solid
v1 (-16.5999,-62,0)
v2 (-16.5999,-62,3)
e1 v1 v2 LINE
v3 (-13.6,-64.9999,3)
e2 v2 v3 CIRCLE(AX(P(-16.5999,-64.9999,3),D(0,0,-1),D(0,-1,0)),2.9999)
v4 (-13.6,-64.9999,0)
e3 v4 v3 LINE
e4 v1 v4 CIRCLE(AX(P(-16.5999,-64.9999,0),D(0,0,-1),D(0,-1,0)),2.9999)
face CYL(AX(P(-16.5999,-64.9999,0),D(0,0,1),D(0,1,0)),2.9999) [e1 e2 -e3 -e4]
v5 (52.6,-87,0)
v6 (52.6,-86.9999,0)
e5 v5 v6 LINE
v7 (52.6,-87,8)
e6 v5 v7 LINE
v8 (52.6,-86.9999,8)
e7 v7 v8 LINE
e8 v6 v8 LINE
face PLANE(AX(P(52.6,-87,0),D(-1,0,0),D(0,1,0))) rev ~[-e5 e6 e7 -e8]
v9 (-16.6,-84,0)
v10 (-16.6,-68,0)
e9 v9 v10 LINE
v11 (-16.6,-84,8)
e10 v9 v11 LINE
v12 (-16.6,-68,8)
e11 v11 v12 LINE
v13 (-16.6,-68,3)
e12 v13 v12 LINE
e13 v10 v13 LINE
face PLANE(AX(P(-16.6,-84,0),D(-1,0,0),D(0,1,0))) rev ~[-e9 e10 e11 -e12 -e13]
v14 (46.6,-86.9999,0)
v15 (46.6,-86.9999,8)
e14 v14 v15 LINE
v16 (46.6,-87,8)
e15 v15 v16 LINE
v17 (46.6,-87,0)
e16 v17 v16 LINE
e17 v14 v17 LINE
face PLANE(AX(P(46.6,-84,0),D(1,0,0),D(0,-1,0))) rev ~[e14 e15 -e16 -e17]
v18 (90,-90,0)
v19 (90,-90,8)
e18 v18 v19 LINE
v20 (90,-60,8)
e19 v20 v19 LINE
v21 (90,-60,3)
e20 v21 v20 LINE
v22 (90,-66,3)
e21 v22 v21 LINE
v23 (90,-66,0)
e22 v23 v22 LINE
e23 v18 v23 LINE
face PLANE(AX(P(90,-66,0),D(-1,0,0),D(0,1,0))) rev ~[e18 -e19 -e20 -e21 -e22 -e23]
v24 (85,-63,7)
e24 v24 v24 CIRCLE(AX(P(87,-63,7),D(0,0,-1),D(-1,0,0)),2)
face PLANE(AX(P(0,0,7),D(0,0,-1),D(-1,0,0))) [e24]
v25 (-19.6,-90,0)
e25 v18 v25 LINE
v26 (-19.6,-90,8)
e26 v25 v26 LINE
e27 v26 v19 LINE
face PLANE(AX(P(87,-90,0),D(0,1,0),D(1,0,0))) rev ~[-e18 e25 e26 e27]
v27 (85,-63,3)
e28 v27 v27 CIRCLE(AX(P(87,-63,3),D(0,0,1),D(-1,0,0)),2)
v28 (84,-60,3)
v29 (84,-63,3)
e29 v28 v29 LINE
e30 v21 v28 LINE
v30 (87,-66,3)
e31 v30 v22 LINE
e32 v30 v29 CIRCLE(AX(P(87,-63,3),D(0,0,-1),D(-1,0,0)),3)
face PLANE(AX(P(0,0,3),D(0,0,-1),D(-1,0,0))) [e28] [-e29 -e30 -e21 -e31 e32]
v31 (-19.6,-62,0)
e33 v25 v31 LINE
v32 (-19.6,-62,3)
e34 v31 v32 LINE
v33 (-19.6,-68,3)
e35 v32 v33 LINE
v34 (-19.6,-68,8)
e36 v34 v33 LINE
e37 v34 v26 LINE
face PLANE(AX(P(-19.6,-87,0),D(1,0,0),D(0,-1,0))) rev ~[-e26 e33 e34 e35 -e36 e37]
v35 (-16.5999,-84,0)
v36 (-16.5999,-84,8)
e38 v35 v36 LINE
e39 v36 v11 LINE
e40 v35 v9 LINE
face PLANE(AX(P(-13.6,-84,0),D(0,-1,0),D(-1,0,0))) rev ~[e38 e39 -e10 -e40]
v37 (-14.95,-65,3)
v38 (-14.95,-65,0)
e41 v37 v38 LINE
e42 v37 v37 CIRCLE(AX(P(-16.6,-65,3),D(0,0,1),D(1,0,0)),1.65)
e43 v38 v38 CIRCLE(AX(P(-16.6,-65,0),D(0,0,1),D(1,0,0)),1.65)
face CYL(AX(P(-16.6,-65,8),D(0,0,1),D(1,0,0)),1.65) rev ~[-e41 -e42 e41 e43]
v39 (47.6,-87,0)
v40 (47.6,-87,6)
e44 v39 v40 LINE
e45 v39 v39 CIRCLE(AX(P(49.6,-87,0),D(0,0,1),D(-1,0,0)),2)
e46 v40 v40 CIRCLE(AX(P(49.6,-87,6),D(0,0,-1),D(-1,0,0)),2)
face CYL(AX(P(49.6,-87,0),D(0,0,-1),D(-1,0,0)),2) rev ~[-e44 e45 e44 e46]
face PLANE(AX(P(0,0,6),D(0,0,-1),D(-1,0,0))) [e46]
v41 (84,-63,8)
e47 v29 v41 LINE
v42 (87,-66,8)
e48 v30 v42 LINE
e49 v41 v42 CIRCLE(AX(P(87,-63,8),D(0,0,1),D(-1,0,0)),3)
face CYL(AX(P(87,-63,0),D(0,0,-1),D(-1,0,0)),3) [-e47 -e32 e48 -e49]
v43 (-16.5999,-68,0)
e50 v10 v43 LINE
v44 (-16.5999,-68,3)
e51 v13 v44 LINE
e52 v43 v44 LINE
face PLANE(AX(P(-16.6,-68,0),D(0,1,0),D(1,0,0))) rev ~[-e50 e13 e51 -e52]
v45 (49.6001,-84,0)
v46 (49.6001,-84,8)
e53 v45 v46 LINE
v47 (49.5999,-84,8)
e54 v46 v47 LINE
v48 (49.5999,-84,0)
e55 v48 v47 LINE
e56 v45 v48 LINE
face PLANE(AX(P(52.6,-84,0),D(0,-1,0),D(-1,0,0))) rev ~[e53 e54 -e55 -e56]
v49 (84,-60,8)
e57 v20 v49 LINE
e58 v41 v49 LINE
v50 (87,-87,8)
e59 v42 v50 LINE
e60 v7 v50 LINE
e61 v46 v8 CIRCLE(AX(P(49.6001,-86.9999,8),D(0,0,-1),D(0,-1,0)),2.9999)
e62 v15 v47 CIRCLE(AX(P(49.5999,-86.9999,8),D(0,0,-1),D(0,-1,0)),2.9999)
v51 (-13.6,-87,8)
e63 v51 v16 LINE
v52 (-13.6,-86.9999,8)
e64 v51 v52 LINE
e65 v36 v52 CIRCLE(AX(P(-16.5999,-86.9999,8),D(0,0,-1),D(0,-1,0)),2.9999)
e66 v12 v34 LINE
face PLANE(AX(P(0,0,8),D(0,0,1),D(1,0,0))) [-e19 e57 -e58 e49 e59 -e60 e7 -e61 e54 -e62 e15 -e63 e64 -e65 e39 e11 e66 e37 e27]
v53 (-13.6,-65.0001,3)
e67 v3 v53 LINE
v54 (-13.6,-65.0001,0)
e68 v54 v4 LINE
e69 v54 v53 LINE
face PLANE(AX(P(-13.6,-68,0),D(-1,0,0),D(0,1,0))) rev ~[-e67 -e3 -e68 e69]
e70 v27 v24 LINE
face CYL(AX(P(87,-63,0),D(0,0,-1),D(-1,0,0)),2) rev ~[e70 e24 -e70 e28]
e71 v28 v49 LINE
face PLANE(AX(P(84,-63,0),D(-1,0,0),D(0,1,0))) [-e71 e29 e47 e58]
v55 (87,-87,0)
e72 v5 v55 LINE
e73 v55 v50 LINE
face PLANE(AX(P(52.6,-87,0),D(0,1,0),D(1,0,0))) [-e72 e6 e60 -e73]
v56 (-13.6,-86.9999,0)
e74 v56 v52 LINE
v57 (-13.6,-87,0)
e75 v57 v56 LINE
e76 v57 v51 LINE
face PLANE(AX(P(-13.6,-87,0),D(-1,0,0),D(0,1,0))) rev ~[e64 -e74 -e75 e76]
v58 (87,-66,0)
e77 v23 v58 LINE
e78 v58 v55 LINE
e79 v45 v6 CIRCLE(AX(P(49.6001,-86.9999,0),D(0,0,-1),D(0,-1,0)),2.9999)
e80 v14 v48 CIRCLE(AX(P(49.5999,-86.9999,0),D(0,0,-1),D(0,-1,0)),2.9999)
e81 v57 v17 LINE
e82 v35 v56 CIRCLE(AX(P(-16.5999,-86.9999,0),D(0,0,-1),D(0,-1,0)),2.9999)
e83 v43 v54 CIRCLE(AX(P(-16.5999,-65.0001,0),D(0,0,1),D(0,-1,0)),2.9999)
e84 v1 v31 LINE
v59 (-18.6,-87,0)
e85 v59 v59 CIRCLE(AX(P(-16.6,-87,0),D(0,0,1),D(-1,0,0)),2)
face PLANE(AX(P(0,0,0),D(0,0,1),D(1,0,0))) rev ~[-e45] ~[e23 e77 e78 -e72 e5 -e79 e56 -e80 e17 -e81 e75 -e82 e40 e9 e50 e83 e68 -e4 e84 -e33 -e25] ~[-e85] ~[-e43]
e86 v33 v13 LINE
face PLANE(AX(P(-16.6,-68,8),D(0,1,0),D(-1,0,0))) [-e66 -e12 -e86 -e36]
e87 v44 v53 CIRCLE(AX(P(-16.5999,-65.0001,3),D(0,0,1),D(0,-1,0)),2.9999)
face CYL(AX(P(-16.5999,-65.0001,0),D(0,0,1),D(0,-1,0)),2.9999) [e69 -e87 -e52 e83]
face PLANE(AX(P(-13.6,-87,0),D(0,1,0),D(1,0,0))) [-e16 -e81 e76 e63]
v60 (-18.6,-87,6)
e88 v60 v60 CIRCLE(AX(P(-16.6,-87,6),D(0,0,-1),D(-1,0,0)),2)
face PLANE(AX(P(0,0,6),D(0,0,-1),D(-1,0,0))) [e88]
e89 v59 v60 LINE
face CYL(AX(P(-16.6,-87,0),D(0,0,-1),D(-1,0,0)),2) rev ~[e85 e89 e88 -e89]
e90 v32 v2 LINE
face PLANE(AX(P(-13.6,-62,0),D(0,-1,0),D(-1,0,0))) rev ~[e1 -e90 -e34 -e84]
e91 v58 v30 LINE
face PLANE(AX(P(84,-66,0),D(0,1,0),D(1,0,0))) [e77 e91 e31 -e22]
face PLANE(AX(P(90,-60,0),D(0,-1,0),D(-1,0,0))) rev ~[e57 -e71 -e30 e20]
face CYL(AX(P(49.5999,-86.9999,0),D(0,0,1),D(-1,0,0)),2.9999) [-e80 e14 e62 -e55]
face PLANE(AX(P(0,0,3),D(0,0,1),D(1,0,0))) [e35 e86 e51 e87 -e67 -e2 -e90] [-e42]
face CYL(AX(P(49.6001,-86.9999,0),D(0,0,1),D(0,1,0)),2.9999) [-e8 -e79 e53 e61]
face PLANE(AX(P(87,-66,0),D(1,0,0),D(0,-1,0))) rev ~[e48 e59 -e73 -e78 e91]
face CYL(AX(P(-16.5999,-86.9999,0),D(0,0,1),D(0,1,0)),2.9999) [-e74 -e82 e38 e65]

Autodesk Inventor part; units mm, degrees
ref_plane "YZ Plane" through (0, 0, 0) normal (1, 0, 0) x (0, 1, 0)
ref_plane "XZ Plane" through (0, 0, 0) normal (0, 1, 0) x (-1, 0, 0)
ref_plane "XY Plane" through (0, 0, 0) normal (0, 0, 1) x (1, 0, 0)
sketch "Sketch1" plane through (0, 0, 0) normal (0, 0, 1) x (1, 0, 0)
  line L0 (-58, -60) -> (-60, -60) projected
  line L1 (-60, -60) -> (-60, -39.5) projected
  line L2 (-60, -39.5) -> (-58, -39.5) projected
  line L3 (-58, -39.5) -> (-58, -60) projected
  line L4 (49.6, 30) -> (51.6, 30) projected
  line L5 (51.6, 30) -> (51.6, 9.5) projected
  line L6 (51.6, 9.5) -> (49.6, 9.5) projected
  line L7 (49.6, 9.5) -> (49.6, 30) projected
  line L8 (-58, 39.5) -> (-60, 39.5) projected
  line L9 (-60, 39.5) -> (-60, 60) projected
  line L10 (-60, 60) -> (-58, 60) projected
  line L11 (-58, 60) -> (-58, 39.5) projected
  line L12 (-21.6, -39.5) -> (-19.6, -39.5) projected
  line L13 (-19.6, -39.5) -> (-19.6, -60) projected
  line L14 (-19.6, -60) -> (-21.6, -60) projected
  line L15 (-21.6, -60) -> (-21.6, -39.5) projected
  line L16 (51.6, -30) -> (49.6, -30) projected
  line L17 (49.6, -30) -> (49.6, -9.5) projected
  line L18 (49.6, -9.5) -> (51.6, -9.5) projected
  line L19 (51.6, -9.5) -> (51.6, -30) projected
  line L20 (-21.6, 60) -> (-19.6, 60) projected
  line L21 (-19.6, 60) -> (-19.6, 39.5) projected
  line L22 (-19.6, 39.5) -> (-21.6, 39.5) projected
  line L23 (-21.6, 39.5) -> (-21.6, 60) projected
  line L24 (90, -35) -> (90, 35) projected
  line L25 (90, 35) -> (49.6, 35) projected
  line L26 (49.6, 35) -> (49.6, 60) projected
  line L27 (49.6, 60) -> (90, 60) projected
  line L28 (90, 60) -> (90, 90) projected
  line L29 (90, 90) -> (-19.6, 90) projected
  line L30 (-19.6, 90) -> (-19.6, 65) projected
  line L31 (-19.6, 65) -> (-60, 65) projected
  line L32 (-60, 65) -> (-60, 90) projected
  line L33 (-60, 90) -> (-90, 90) projected
  line L34 (-90, 90) -> (-90, -90) projected
  line L35 (-90, -90) -> (-60, -90) projected
  line L36 (-60, -90) -> (-60, -65) projected
  line L37 (-60, -65) -> (-19.6, -65) projected
  line L38 (-19.6, -65) -> (-19.6, -90) projected
  line L39 (-19.6, -90) -> (90, -90) projected
  line L40 (90, -90) -> (90, -60) projected
  line L41 (90, -60) -> (49.6, -60) projected
  line L42 (49.6, -60) -> (49.6, -35) projected
  line L43 (49.6, -35) -> (90, -35) projected
  line L44 (86, -32) -> (73.8, -32) projected
  line L45 (73.8, -32) -> (73.8, -7.5) projected
  line L46 (73.8, -7.5) -> (86, -7.5) projected
  line L47 (86, -7.5) -> (86, -32) projected
  line L48 (65.8, -32) -> (53.6, -32) projected
  line L49 (53.6, -32) -> (53.6, -7.5) projected
  line L50 (53.6, -7.5) -> (65.8, -7.5) projected
  line L51 (65.8, -7.5) -> (65.8, -32) projected
  line L52 (86, -86) -> (70.6, -86) projected
  line L53 (70.6, -86) -> (70.6, -69.8) projected
  line L54 (70.6, -69.8) -> (86, -69.8) projected
  line L55 (86, -69.8) -> (86, -86) projected
  line L56 (86, 86) -> (86, 69.8) projected
  line L57 (86, 69.8) -> (70.6, 69.8) projected
  line L58 (70.6, 69.8) -> (70.6, 86) projected
  line L59 (70.6, 86) -> (86, 86) projected
  line L60 (73.8, 32) -> (86, 32) projected
  line L61 (86, 32) -> (86, 7.5) projected
  line L62 (86, 7.5) -> (73.8, 7.5) projected
  line L63 (73.8, 7.5) -> (73.8, 32) projected
  line L64 (65.8, 32) -> (65.8, 7.5) projected
  line L65 (65.8, 7.5) -> (53.6, 7.5) projected
  line L66 (53.6, 7.5) -> (53.6, 32) projected
  line L67 (53.6, 32) -> (65.8, 32) projected
  line L68 (-69.6, -87) -> (-85, -87) projected
  line L69 (-85, -87) -> (-85, -70.8) projected
  line L70 (-85, -70.8) -> (-69.6, -70.8) projected
  line L71 (-69.6, -70.8) -> (-69.6, -87) projected
  line L72 (-56, -62) -> (-56, -37.5) projected
  line L73 (-56, -37.5) -> (-43.8, -37.5) projected
  line L74 (-43.8, -37.5) -> (-43.8, -62) projected
  line L75 (-43.8, -62) -> (-56, -62) projected
  line L76 (-56, 62) -> (-43.8, 62) projected
  line L77 (-43.8, 62) -> (-43.8, 37.5) projected
  line L78 (-43.8, 37.5) -> (-56, 37.5) projected
  line L79 (-56, 37.5) -> (-56, 62) projected
  line L80 (-23.6, 62) -> (-23.6, 37.5) projected
  line L81 (-23.6, 37.5) -> (-35.8, 37.5) projected
  line L82 (-35.8, 37.5) -> (-35.8, 62) projected
  line L83 (-35.8, 62) -> (-23.6, 62) projected
  line L84 (-23.6, -62) -> (-35.8, -62) projected
  line L85 (-35.8, -62) -> (-35.8, -37.5) projected
  line L86 (-35.8, -37.5) -> (-23.6, -37.5) projected
  line L87 (-23.6, -37.5) -> (-23.6, -62) projected
  line L88 (-85, 87) -> (-69.6, 87) projected
  line L89 (-69.6, 87) -> (-69.6, 70.8) projected
  line L90 (-69.6, 70.8) -> (-85, 70.8) projected
  line L91 (-85, 70.8) -> (-85, 87) projected
  circle A0 centre (87, -63) radius 2 projected
  line L92 (90, -60) -> (90, -66) projected
  line L93 (84, -60) -> (90, -60) projected
  line L94 (84, -63) -> (84, -60) projected
  line L95 (90, -66) -> (87, -66) projected
  line L96 (-19.6, 68) -> (-16.6, 68) projected
  line L97 (-16.6, 68) -> (-16.6, 84) projected
  line L98 (-13.6, 87) -> (46.6, 87) projected
  line L99 (52.6, 87) -> (87, 87) projected
  line L100 (87, 87) -> (87, 66) projected
  line L101 (84, 63) -> (84, 60) projected
  line L102 (84, 60) -> (90, 60) projected
  line L103 (90, 60) -> (90, 90) projected
  line L104 (90, 90) -> (-19.6, 90) projected
  line L105 (-19.6, 90) -> (-19.6, 68) projected
  line L106 (90, -66) -> (87, -66)
  line L107 (87, -66) -> (87, -90)
  line L108 (87, -90) -> (90, -90)
  line L109 (90, -90) -> (90, -66)
  line L110 (87, -90) -> (-19.6, -90)
  line L111 (-19.6, -90) -> (-19.6, -87)
  line L112 (-19.6, -87) -> (87, -87)
  line L113 (87, -87) -> (87, -90)
  line L114 (-19.6, -87) -> (-16.6, -87)
  line L115 (-16.6, -87) -> (-16.6, -65)
  line L116 (-16.6, -65) -> (-19.6, -65)
  line L117 (-19.6, -65) -> (-19.6, -87)
  line L118 (-19.6, -65) -> (-16.6, -65)
  line L119 (-16.6, -65) -> (-16.6, -68)
  line L120 (-16.6, -68) -> (-19.6, -68)
  line L121 (-19.6, -68) -> (-19.6, -65)
  line L122 (-19.6, -68) -> (-13.6, -68)
  line L123 (-13.6, -68) -> (-13.6, -62)
  line L124 (-13.6, -62) -> (-19.6, -62)
  line L125 (-19.6, -62) -> (-19.6, -68)
  line L126 (-19.6, -90) -> (-13.6, -90)
  line L127 (-13.6, -90) -> (-13.6, -84)
  line L128 (-13.6, -84) -> (-19.6, -84)
  line L129 (-19.6, -84) -> (-19.6, -90)
  line L130 (46.6, -90) -> (52.6, -90)
  line L131 (52.6, -90) -> (52.6, -84)
  line L132 (52.6, -84) -> (46.6, -84)
  line L133 (46.6, -84) -> (46.6, -90)
  circle A1 centre (-63, -65) radius 1.5 projected
  circle A2 centre (-16.6, -87) radius 1.5 projected
  circle A3 centre (49.6, -87) radius 1.5 projected
  circle A4 centre (46.6, -60) radius 1.5 projected
  circle A5 centre (87, -63) radius 1.5 projected
  circle A6 centre (46.6, -32) radius 1.5 projected
  circle A7 centre (46.6, 32) radius 1.5 projected
  circle A8 centre (87, 63) radius 1.5 projected
  circle A9 centre (46.6, 60) radius 1.5 projected
  circle A10 centre (49.6, 87) radius 1.5 projected
  circle A11 centre (-16.6, 87) radius 1.5 projected
  circle A12 centre (-16.6, 65) radius 1.5 projected
  circle A13 centre (-63, 65) radius 1.5 projected
  arc A14 (87, 66) -> (84, 63) centre (87, 63) ccw projected
  arc A15 (-16.6, 84) -> (-13.6, 87) centre (-16.6, 87) ccw projected
  arc A16 (46.6, 87) -> (52.6, 87) centre (49.6, 87) ccw projected
  arc A17 (84, -63) -> (87, -66) centre (87, -63) ccw projected
  line L134 (-76, -39.25) -> (-82, -39.25) projected
  line L135 (-82, -39.25) -> (-82, -20.75) projected
  line L136 (-82, -20.75) -> (-76, -20.75) projected
  line L137 (-76, -20.75) -> (-76, -39.25) projected
  line L138 (-76, 20.75) -> (-82, 20.75) projected
  line L139 (-82, 20.75) -> (-82, 39.25) projected
  line L140 (-82, 39.25) -> (-76, 39.25) projected
  line L141 (-76, 39.25) -> (-76, 20.75) projected
  circle A18 centre (-87, 55.8) radius 1.25 projected
  circle A19 centre (-87, -55.8) radius 1.25 projected
  point P0 (0, 0)
  point P1 (52.6, -87)
  point P2 (46.6, -87)
  point P3 (-13.6, -87)
  point P4 (-16.6, -84)
  dimension "d0" = 3
  dimension "d1" = 3
  dimension "d2" = 6
  dimension "d3" = 6
  dimension "d4" = 6
  dimension "d5" = 6
  dimension "d6" = 6
  dimension "d7" = 6
extrude "Extrusion1" add sketch "Sketch1" along normal blind 8 contours L41 L40 L95 A17 L94 | L40 L39 L107 L95 | L107 L39 L131 L112 | L131 L39 L133 L112 A3 | L112 A3 L133 L132 L131 | A3 L112 | L112 A3 | L39 L127 L112 L133 | L39 L38 L112 A2 L127 | L112 A2 L115 L128 L127 | L38 L128 L115 A2 L112 | A2 L112 | L112 L115 A2 | L38 L120 L115 L128 | A2 L115 L112 | L38 L116 L115 L120 | L115 L116 L125 L124 L123 L122 | A0 | A5
sketch "Sketch2" plane through (0, 0, 0) normal (0, 0, -1) x (-1, 0, 0)
  line L0 (-84, -66) -> (-87, -66) projected
  line L1 (-90, -90) -> (-90, -60) projected
  line L2 (-84, -66) -> (-90, -66)
  line L3 (-90, -66) -> (-90, -60)
  line L4 (-90, -60) -> (-84, -60)
  line L5 (-84, -60) -> (-84, -66)
  line L6 (-84, -60) -> (-90, -66)
  line L7 (-90, -60) -> (-84, -66)
  circle A0 centre (-87, -63) radius 2
  line L8 (-52.6, -84) -> (-46.6, -84) projected
  line L9 (-46.6, -84) -> (-52.6, -90)
  line L10 (19.6, -90) -> (-90, -90) projected
  line L11 (-52.6, -84) -> (-46.6, -90)
  line L12 (-46.6, -90) -> (-46.6, -84)
  line L13 (-52.6, -84) -> (-52.6, -90)
  circle A1 centre (-49.6, -87) radius 2
  line L14 (13.6, -84) -> (16.6, -84) projected
  line L15 (13.6, -84) -> (19.6, -90)
  line L16 (19.6, -62) -> (19.6, -90) projected
  line L17 (19.6, -84) -> (13.6, -90)
  line L18 (19.6, -84) -> (13.6, -84)
  circle A2 centre (16.6, -87) radius 2
  line L19 (13.6, -68) -> (13.6, -62) projected
  line L20 (13.6, -68) -> (19.6, -62)
  line L21 (19.6, -68) -> (13.6, -62)
  line L22 (13.6, -62) -> (13.6, -68)
  line L23 (19.6, -68) -> (13.6, -68)
  circle A3 centre (16.6, -65) radius 2
  point P0 (0, 0)
  point P1 (19.6, -87)
  dimension "d10" = 4
  dimension "d11" = 4
  dimension "d12" = 4
  dimension "d13" = 4
extrude "Extrusion2" cut sketch "Sketch2" against normal blind 6 contours A1 L9 L11 | L11 L9 A1 | A1 L11 L9 | L11 A1 L9 | A2 L17 L15 | L15 L17 A2 | A2 L15 L17 | L15 A2 L17
extrude "Extrusion3" cut sketch "Sketch2" against normal blind 7 contours A0 L6 L7 | L7 L6 A0 | L6 L7 A0 | L6 A0 L7
extrude "Extrusion4" cut sketch "Sketch2" against normal blind 3 contours L7 A0 L6 L5 | L0 L2 L6 A0 L7 | L6 A0 L7 L4 | L1 L7 A0 L6
sketch "Sketch3" plane through (0, 0, 8) normal (0, 0, 1) x (1, 0, 0)
  line L0 (-16.6, -68) -> (-13.6, -68) projected
  line L1 (-19.6, -62) -> (-19.6, -90) projected
  line L2 (-13.6, -68) -> (-19.6, -62)
  line L3 (-19.6, -62) -> (-13.6, -62)
  line L4 (-13.6, -62) -> (-19.6, -68)
  line L5 (-13.6, -68) -> (-19.6, -68)
  line L6 (-13.6, -62) -> (-13.6, -68)
  circle A0 centre (-16.6, -65) radius 1.65
  point P0 (0, 0)
  point P1 (-19.6, -87)
  point P2 (-17.7667, -66.1667)
  point P3 (-17.7667, -63.8333)
  dimension "d20" = 3.3
extrude "Extrusion5" cut sketch "Sketch3" against normal blind 5 contours L5 L4 A0 L2 L0 | L2 A0 L4 L6 | L1 L2 A0 L4 | L4 A0 L2 L3
extrude "Extrusion6" cut sketch "Sketch3" against normal blind 8 contours A0 L4 L2 | L2 L4 A0 | A0 L2 L4 | L2 A0 L4
fillet "Fillet1" radius 3 5 edges at (52.6, -84, 4) (46.6, -84, 4) (-13.6, -68, 1.5) (-13.6, -62, 1.5) (-13.6, -84, 4)
properties part number "rightwall2"
